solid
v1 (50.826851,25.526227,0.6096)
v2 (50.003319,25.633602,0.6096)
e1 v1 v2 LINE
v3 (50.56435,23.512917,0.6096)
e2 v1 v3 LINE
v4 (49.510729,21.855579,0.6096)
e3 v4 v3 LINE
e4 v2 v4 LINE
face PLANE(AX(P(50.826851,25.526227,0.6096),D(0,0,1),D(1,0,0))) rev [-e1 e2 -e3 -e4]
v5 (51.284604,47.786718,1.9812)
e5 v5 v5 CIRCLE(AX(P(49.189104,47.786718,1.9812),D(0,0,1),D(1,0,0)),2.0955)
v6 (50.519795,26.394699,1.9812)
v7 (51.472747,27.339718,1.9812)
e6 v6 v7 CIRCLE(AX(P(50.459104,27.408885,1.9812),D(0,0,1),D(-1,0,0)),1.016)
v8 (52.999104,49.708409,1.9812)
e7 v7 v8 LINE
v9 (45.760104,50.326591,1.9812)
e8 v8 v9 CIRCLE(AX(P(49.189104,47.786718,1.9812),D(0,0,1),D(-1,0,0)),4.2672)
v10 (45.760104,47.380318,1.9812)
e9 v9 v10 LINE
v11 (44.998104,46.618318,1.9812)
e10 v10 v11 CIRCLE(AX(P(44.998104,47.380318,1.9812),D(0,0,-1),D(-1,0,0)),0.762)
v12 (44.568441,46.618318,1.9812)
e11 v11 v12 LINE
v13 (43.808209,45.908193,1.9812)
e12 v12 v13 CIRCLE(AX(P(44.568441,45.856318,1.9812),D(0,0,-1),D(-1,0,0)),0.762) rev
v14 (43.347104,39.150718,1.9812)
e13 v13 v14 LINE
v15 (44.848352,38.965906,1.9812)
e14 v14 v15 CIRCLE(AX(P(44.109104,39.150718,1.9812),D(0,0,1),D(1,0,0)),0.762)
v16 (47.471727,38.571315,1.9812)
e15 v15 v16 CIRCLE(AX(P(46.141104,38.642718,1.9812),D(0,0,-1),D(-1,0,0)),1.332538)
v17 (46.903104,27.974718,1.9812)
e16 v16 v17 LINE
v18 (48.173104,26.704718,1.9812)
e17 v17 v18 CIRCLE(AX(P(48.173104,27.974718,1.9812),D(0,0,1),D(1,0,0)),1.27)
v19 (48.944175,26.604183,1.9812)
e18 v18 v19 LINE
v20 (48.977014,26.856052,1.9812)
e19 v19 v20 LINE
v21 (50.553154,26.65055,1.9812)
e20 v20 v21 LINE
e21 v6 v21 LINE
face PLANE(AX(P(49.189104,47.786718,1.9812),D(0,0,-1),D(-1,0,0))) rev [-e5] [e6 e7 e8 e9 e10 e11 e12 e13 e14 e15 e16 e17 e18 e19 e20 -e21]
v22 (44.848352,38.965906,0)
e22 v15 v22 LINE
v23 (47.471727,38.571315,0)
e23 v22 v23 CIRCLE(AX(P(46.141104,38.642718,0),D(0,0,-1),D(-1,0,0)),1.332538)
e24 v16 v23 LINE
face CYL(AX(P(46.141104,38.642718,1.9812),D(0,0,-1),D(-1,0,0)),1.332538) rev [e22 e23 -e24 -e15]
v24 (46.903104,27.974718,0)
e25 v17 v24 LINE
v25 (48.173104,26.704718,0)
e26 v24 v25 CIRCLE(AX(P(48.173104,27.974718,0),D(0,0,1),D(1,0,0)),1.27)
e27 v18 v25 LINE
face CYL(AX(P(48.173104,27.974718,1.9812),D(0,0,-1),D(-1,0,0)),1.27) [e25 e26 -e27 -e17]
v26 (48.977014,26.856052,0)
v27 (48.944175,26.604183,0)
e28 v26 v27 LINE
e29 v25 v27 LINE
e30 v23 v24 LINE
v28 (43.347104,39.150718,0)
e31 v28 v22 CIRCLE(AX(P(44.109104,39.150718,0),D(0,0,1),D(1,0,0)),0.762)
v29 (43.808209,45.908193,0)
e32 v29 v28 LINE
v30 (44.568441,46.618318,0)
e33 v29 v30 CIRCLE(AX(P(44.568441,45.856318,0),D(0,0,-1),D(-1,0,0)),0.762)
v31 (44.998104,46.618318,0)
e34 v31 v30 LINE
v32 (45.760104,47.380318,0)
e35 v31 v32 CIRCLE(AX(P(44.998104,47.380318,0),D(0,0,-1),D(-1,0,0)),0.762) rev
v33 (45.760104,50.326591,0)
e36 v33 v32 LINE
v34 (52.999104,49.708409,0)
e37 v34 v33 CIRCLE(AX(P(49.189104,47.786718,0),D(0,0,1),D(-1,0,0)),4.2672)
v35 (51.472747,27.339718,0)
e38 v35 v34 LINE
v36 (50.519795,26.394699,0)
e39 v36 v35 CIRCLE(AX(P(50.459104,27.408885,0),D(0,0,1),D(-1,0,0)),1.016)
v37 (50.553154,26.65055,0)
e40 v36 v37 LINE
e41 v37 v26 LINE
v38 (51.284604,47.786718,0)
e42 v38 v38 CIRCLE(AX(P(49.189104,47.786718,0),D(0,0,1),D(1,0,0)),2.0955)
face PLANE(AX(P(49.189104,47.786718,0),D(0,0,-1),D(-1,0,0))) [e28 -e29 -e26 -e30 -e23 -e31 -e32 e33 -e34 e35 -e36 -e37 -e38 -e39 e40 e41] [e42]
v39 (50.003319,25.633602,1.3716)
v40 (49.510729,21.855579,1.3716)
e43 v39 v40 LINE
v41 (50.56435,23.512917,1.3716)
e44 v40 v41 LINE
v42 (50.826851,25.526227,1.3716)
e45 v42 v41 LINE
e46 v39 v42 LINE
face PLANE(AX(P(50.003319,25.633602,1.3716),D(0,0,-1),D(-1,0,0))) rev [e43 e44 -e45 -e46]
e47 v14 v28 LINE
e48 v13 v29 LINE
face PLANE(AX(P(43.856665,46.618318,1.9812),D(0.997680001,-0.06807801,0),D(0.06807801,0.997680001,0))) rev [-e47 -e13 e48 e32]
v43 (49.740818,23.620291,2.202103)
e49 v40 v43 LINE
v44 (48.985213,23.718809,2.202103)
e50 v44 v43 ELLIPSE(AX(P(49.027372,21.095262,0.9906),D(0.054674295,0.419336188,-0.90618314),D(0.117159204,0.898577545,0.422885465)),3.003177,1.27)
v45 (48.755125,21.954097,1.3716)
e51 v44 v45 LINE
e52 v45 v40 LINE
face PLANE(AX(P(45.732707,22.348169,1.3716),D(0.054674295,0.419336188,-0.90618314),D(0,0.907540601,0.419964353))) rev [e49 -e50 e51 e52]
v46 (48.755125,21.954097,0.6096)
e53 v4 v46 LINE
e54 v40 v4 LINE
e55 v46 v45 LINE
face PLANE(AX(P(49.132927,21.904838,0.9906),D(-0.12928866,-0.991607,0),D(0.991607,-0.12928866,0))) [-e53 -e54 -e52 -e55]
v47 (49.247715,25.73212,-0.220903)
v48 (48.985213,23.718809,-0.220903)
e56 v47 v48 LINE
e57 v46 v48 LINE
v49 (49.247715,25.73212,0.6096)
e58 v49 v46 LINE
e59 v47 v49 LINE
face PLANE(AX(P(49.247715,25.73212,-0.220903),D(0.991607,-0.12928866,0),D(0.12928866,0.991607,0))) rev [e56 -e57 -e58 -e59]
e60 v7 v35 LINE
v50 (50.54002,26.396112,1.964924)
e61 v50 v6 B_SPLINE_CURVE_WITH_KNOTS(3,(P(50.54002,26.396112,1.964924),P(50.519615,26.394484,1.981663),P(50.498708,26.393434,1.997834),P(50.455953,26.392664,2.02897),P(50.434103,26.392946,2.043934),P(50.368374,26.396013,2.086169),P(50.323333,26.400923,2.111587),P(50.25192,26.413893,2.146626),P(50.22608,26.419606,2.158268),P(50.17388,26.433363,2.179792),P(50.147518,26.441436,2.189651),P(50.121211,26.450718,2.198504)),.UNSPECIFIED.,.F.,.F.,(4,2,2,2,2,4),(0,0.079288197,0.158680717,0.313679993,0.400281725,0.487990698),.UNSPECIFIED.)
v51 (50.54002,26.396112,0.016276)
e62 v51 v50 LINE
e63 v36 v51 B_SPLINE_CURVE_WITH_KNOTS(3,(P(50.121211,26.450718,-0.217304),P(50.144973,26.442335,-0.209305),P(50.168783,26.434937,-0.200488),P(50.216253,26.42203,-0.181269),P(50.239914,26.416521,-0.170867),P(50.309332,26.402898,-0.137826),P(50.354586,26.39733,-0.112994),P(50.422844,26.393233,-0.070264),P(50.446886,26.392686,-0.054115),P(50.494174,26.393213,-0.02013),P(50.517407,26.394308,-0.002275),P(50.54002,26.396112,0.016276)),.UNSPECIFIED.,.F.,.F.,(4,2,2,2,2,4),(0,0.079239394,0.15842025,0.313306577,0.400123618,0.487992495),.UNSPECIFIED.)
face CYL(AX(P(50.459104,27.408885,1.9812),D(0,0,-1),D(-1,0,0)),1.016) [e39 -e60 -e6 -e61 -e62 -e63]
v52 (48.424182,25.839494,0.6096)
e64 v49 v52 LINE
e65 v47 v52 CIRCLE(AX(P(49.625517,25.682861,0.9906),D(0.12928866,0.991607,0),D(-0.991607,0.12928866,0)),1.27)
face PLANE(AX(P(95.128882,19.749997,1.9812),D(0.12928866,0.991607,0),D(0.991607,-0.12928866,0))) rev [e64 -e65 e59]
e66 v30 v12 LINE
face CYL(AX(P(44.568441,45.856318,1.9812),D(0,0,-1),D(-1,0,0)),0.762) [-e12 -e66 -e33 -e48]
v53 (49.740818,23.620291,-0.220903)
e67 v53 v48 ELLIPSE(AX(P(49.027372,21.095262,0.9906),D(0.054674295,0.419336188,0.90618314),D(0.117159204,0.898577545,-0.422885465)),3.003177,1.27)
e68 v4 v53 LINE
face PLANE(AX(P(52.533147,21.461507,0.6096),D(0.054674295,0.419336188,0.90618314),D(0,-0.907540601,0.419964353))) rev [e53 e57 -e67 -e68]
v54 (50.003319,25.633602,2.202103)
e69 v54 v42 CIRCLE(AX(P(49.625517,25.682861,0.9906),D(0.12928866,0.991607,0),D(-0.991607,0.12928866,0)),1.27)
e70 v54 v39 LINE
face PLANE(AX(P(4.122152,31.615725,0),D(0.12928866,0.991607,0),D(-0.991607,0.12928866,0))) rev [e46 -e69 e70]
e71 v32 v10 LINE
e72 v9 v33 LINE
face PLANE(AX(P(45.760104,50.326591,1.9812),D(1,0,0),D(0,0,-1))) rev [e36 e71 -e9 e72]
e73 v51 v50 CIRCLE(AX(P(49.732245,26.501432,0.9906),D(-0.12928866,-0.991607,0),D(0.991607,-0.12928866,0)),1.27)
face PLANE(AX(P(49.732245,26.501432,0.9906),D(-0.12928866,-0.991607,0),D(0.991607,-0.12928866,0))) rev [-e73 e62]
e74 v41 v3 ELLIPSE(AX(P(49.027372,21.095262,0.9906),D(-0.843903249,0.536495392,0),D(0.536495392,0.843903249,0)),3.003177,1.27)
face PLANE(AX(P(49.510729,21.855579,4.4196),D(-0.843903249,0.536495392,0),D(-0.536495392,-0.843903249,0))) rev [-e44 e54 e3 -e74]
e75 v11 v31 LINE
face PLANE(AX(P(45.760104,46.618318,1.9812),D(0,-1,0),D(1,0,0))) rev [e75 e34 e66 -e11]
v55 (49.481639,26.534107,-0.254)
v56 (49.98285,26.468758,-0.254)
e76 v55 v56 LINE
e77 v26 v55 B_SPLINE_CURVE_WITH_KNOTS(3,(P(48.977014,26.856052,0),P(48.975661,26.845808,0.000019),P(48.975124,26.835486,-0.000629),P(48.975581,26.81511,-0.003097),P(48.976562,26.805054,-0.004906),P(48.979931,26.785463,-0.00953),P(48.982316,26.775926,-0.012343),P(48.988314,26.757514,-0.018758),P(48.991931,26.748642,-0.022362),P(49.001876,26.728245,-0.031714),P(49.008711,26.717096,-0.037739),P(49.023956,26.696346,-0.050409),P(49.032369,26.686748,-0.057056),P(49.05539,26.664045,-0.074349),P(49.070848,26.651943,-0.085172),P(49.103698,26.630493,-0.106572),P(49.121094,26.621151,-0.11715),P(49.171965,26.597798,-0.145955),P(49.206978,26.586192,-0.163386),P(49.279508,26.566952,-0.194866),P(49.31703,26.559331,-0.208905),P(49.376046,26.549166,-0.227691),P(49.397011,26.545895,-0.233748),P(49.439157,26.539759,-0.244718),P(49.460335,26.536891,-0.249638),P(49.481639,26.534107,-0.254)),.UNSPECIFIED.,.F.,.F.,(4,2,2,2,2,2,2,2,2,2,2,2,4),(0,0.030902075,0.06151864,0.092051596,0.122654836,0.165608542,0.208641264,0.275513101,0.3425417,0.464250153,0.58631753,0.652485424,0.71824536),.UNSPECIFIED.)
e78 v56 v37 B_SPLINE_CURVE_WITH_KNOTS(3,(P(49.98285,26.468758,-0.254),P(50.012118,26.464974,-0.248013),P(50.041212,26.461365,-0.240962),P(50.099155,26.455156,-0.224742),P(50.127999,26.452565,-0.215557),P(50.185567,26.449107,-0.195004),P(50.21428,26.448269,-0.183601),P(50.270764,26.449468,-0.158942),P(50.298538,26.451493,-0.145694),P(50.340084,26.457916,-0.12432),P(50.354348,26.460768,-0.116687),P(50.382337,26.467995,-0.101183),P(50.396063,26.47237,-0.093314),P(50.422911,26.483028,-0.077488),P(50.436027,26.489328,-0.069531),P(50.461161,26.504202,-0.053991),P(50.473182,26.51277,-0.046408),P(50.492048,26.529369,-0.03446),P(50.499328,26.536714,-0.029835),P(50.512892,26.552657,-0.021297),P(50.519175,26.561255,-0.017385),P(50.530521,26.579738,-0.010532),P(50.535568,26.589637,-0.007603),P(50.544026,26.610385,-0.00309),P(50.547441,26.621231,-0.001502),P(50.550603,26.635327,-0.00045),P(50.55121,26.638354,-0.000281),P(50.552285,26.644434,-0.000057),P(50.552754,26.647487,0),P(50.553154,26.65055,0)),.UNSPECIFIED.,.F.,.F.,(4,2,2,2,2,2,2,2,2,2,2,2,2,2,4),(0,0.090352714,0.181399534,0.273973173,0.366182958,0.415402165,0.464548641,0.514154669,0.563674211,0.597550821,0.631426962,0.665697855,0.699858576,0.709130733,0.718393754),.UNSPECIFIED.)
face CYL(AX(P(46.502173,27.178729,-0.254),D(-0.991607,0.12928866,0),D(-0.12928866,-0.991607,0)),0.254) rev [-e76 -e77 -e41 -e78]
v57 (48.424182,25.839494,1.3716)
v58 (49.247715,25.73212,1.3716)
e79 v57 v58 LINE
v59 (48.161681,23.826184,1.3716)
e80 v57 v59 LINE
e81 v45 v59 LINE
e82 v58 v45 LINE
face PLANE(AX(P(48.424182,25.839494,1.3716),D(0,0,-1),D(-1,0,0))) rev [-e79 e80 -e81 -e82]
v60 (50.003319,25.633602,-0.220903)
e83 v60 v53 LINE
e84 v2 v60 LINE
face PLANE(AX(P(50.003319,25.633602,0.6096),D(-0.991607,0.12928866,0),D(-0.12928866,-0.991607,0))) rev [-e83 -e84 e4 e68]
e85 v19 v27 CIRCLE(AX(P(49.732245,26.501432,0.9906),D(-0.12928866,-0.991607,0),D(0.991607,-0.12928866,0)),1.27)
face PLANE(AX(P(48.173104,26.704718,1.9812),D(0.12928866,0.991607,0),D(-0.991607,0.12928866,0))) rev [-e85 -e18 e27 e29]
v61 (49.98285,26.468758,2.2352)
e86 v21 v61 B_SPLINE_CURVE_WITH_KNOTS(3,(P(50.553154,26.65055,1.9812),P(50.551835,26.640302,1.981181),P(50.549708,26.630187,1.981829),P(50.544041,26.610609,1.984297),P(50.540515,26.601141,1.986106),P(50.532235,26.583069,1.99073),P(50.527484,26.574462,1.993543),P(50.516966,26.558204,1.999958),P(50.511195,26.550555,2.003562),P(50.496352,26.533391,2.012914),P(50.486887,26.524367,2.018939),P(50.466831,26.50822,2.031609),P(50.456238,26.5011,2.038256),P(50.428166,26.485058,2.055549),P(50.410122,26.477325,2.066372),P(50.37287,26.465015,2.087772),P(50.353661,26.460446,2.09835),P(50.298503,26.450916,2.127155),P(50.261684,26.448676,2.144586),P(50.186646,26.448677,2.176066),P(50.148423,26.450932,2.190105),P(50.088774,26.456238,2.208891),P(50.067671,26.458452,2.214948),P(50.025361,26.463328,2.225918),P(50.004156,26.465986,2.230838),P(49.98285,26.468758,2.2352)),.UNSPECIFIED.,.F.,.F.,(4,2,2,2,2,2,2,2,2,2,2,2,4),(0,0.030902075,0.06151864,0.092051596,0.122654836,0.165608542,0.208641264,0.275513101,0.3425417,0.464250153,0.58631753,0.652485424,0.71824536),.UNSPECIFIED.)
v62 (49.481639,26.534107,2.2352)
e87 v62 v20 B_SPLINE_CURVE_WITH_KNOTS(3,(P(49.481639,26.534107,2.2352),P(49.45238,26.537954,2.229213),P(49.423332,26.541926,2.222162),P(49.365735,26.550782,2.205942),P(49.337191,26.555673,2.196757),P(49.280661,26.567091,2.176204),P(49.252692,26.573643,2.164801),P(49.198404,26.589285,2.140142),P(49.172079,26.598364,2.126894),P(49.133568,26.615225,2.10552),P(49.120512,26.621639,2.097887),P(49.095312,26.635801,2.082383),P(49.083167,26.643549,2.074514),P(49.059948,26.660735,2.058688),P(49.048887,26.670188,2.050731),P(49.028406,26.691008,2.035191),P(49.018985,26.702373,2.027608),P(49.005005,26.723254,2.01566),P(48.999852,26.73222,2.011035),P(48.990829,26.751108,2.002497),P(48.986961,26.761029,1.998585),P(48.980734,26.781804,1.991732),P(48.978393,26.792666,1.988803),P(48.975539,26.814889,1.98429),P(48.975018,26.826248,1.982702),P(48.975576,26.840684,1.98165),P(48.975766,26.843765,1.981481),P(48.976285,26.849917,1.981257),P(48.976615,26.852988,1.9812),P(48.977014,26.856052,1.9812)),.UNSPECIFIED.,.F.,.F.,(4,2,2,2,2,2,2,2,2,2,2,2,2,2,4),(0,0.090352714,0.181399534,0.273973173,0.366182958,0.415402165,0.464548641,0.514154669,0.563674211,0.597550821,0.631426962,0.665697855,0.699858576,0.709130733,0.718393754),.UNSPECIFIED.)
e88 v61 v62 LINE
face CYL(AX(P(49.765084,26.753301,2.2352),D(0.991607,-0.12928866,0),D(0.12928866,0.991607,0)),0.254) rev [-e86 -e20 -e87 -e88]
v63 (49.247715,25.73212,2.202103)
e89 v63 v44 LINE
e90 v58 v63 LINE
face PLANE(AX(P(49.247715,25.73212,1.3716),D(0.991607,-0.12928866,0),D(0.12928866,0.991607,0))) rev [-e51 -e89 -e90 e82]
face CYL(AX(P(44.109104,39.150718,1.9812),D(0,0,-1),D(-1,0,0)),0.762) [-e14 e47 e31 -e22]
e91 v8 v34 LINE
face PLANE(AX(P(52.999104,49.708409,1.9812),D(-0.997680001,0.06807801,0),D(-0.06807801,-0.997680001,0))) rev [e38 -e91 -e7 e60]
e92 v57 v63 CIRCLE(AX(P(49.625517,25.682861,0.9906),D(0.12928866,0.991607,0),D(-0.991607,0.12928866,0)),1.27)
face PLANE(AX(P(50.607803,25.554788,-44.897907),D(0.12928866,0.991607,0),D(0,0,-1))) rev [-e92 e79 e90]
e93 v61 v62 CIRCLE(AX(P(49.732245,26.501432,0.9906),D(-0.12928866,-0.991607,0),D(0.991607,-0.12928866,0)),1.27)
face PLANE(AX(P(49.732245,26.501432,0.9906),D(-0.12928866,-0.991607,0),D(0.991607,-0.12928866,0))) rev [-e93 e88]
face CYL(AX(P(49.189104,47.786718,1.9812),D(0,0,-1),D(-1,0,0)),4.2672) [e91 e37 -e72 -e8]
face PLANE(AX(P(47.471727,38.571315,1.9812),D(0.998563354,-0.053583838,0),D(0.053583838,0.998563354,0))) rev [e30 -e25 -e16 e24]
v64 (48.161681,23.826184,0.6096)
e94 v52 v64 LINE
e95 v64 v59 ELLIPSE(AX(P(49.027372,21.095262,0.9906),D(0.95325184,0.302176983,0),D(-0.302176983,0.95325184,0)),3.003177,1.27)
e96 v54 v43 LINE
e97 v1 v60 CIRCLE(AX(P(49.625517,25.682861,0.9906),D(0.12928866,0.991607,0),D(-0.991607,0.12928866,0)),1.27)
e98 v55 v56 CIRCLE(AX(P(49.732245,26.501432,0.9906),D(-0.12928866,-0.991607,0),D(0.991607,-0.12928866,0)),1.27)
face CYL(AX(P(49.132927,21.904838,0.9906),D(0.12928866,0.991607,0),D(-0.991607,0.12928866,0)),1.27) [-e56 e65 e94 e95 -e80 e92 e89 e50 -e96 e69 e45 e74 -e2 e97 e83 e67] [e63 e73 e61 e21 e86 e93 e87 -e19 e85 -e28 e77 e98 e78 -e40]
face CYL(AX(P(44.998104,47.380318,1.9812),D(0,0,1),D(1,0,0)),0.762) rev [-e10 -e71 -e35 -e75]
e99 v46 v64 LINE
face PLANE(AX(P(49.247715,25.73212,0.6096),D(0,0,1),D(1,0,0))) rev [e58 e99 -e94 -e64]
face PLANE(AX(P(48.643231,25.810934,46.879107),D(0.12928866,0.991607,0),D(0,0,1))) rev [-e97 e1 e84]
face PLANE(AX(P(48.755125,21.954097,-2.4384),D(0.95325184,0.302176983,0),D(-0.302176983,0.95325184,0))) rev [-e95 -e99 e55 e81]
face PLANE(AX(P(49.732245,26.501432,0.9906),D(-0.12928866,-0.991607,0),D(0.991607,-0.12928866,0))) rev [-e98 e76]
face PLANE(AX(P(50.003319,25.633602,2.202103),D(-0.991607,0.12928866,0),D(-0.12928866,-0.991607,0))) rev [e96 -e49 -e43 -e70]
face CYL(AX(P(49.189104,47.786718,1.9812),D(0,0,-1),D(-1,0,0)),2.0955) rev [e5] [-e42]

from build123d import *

# Parameters (mm, degrees)
SKETCH1_R           = 2.0955
BOSS_EXTRUDE1_DEPTH = 1.9812
FILLET1_R           = 0.762
SKETCH3_R           = 1.27
BOSS_EXTRUDE2_DEPTH = 4.6355
SKETCH5_W           = 0.830502785
SKETCH5_H           = 0.830502786
CUT_EXTRUDE1_DEPTH  = 3.81
CUT_EXTRUDE2_DEPTH  = 3.81
CIRPATTERN1_COUNT   = 4
FILLET3_R           = 0.254


with BuildPart() as part:
    # Sketch1 → Boss-Extrude1 (new body)
    with BuildSketch(Plane.XY):
        with BuildLine():
            Line((45.760103821, 50.326590864), (45.760103821, 46.618317867))
            Line((45.760103821, 46.618317867), (43.856665355, 46.618317867))
            Line((43.856665355, 46.618317867), (43.347103821, 39.150717867))
            ThreePointArc((43.347103821, 39.150717867), (44.016000174, 38.394427109), (44.848352407, 38.965905721))
            ThreePointArc((44.848352407, 38.965905721), (46.339305619, 39.960432804), (47.471727095, 38.571315385))
            Line((47.471727095, 38.571315385), (46.903103821, 27.974717867))
            ThreePointArc((46.903103821, 27.974717867), (47.275078209, 27.076692255), (48.173103821, 26.704717867))
            Line((48.173103821, 26.704717867), (50.12121108, 26.450717867))
            ThreePointArc((50.12121108, 26.450717867), (51.01744047, 26.560052876), (51.472746702, 27.339717867))
            Line((51.472746702, 27.339717867), (52.999103821, 49.708408747))
            ThreePointArc((52.999103821, 49.708408747), (49.552184435, 52.0384432), (45.760103821, 50.326590864))
        make_face()
        with Locations((49.189103821, 47.786717867)):
            Circle(SKETCH1_R, mode=Mode.SUBTRACT)
    extrude(amount=BOSS_EXTRUDE1_DEPTH)

    # Fillet1
    fillet1_edges = [part.edges().sort_by_distance(p)[0] for p in [
        (43.856665355, 46.618317867, 0.9906),
        (45.760103821, 46.618317867, 0.9906),
    ]]
    fillet(fillet1_edges, radius=FILLET1_R)

    # Sketch3 → Boss-Extrude2 (add)
    with BuildSketch(Plane(origin=(4.228879683, 32.434296092, 0), x_dir=(0.9916069999104432, -0.12928866047960397, 0), z_dir=(-0.12928866047960397, -0.9916069999104432, 0))):
        with Locations(Location((45.888507166, 0.9906, 0), (0, 0, 231.260575402))):
            Circle(SKETCH3_R)
    extrude(amount=BOSS_EXTRUDE2_DEPTH)

    # Sketch5 → Cut-Extrude1 (cut)
    with BuildSketch(Plane(origin=(3.629562097, 27.837701844, 0), x_dir=(0.9916069999104432, -0.129288660479604, 0), z_dir=(-0.129288660479604, -0.9916069999104432, 0))):
        with Locations((46.684758559, 1.786851393)):
            Rectangle(SKETCH5_W, SKETCH5_H)
    cut_extrude1 = extrude(amount=-CUT_EXTRUDE1_DEPTH, mode=Mode.SUBTRACT)

    # Sketch6 → Cut-Extrude2 (cut)
    with BuildSketch(Plane(origin=(45.881167188, -5.982122602, 0), x_dir=(0, 0, -1), z_dir=(0.9916069999104432, -0.129288660479604, 0))):
        Polygon((-1.3716, 28.073321232), (-2.2606, 29.978321232), (-2.2606, 28.073321232), align=None)
    cut_extrude2 = extrude(amount=-CUT_EXTRUDE2_DEPTH, mode=Mode.SUBTRACT)

    # CirPattern1: Cut-Extrude1, Cut-Extrude2 ×4 about axis
    cirpattern1_axis = Axis((45.503364921, -5.932863623, 0.9906), (0.1292886604796056, 0.991606999910443, 0))
    add([cut_extrude1.rotate(cirpattern1_axis, i * 360 / CIRPATTERN1_COUNT) for i in range(1, CIRPATTERN1_COUNT)], mode=Mode.SUBTRACT)
    add([cut_extrude2.rotate(cirpattern1_axis, i * 360 / CIRPATTERN1_COUNT) for i in range(1, CIRPATTERN1_COUNT)], mode=Mode.SUBTRACT)

    # Fillet3
    # the kernel refuses this fillet: 0.254 mm, written as the material it adds along each edge
    with BuildSketch(Plane(origin=(48.314504429, 26.686281636, 1.9812), x_dir=(0.1292886604796056, 0.9916069999104429, 0), z_dir=(0.991606999910443, -0.1292886604796056, -1.1175710787249272e-14))) as fillet3_piece_1_section:
        with BuildLine():
            CenterArc((FILLET3_R, FILLET3_R), FILLET3_R, 180, 90)
            Line((0, FILLET3_R), (0, 0))
            Line((0, 0), (FILLET3_R, 0))
        make_face()
    fillet3_piece_1 = extrude(amount=2.859479965, mode=Mode.PRIVATE)
    fillet3_piece_1 = fillet3_piece_1 & Plane(origin=(49.739170081, 26.554548895, 0.9906), x_dir=(-0.6205273463723372, 0.08090619510621488, -0.7799999999984234), z_dir=(0.12928866047960397, 0.9916069999104432, 0)) * Cylinder(1.27, 7, mode=Mode.PRIVATE)
    add(fillet3_piece_1)
    with BuildSketch(Plane(origin=(51.149984779, 26.316583302, 0), x_dir=(0.12928866047960436, 0.9916069999104431, 0), z_dir=(-0.9916069999104432, 0.12928866047960438, 1.2608297213769615e-12))) as fillet3_piece_2_section:
        with BuildLine():
            CenterArc((FILLET3_R, FILLET3_R), FILLET3_R, 180, 90)
            Line((0, FILLET3_R), (0, 0))
            Line((0, 0), (FILLET3_R, 0))
        make_face()
    fillet3_piece_2 = extrude(amount=2.859479965, mode=Mode.PRIVATE)
    fillet3_piece_2 = fillet3_piece_2 & Plane(origin=(49.73917008, 26.554548887, 0.9906), x_dir=(-0.6205273463723372, 0.08090619510621488, -0.7799999999984234), z_dir=(0.12928866047960397, 0.9916069999104432, 0)) * Cylinder(1.27, 7, mode=Mode.PRIVATE)
    add(fillet3_piece_2)


solid = part.part
